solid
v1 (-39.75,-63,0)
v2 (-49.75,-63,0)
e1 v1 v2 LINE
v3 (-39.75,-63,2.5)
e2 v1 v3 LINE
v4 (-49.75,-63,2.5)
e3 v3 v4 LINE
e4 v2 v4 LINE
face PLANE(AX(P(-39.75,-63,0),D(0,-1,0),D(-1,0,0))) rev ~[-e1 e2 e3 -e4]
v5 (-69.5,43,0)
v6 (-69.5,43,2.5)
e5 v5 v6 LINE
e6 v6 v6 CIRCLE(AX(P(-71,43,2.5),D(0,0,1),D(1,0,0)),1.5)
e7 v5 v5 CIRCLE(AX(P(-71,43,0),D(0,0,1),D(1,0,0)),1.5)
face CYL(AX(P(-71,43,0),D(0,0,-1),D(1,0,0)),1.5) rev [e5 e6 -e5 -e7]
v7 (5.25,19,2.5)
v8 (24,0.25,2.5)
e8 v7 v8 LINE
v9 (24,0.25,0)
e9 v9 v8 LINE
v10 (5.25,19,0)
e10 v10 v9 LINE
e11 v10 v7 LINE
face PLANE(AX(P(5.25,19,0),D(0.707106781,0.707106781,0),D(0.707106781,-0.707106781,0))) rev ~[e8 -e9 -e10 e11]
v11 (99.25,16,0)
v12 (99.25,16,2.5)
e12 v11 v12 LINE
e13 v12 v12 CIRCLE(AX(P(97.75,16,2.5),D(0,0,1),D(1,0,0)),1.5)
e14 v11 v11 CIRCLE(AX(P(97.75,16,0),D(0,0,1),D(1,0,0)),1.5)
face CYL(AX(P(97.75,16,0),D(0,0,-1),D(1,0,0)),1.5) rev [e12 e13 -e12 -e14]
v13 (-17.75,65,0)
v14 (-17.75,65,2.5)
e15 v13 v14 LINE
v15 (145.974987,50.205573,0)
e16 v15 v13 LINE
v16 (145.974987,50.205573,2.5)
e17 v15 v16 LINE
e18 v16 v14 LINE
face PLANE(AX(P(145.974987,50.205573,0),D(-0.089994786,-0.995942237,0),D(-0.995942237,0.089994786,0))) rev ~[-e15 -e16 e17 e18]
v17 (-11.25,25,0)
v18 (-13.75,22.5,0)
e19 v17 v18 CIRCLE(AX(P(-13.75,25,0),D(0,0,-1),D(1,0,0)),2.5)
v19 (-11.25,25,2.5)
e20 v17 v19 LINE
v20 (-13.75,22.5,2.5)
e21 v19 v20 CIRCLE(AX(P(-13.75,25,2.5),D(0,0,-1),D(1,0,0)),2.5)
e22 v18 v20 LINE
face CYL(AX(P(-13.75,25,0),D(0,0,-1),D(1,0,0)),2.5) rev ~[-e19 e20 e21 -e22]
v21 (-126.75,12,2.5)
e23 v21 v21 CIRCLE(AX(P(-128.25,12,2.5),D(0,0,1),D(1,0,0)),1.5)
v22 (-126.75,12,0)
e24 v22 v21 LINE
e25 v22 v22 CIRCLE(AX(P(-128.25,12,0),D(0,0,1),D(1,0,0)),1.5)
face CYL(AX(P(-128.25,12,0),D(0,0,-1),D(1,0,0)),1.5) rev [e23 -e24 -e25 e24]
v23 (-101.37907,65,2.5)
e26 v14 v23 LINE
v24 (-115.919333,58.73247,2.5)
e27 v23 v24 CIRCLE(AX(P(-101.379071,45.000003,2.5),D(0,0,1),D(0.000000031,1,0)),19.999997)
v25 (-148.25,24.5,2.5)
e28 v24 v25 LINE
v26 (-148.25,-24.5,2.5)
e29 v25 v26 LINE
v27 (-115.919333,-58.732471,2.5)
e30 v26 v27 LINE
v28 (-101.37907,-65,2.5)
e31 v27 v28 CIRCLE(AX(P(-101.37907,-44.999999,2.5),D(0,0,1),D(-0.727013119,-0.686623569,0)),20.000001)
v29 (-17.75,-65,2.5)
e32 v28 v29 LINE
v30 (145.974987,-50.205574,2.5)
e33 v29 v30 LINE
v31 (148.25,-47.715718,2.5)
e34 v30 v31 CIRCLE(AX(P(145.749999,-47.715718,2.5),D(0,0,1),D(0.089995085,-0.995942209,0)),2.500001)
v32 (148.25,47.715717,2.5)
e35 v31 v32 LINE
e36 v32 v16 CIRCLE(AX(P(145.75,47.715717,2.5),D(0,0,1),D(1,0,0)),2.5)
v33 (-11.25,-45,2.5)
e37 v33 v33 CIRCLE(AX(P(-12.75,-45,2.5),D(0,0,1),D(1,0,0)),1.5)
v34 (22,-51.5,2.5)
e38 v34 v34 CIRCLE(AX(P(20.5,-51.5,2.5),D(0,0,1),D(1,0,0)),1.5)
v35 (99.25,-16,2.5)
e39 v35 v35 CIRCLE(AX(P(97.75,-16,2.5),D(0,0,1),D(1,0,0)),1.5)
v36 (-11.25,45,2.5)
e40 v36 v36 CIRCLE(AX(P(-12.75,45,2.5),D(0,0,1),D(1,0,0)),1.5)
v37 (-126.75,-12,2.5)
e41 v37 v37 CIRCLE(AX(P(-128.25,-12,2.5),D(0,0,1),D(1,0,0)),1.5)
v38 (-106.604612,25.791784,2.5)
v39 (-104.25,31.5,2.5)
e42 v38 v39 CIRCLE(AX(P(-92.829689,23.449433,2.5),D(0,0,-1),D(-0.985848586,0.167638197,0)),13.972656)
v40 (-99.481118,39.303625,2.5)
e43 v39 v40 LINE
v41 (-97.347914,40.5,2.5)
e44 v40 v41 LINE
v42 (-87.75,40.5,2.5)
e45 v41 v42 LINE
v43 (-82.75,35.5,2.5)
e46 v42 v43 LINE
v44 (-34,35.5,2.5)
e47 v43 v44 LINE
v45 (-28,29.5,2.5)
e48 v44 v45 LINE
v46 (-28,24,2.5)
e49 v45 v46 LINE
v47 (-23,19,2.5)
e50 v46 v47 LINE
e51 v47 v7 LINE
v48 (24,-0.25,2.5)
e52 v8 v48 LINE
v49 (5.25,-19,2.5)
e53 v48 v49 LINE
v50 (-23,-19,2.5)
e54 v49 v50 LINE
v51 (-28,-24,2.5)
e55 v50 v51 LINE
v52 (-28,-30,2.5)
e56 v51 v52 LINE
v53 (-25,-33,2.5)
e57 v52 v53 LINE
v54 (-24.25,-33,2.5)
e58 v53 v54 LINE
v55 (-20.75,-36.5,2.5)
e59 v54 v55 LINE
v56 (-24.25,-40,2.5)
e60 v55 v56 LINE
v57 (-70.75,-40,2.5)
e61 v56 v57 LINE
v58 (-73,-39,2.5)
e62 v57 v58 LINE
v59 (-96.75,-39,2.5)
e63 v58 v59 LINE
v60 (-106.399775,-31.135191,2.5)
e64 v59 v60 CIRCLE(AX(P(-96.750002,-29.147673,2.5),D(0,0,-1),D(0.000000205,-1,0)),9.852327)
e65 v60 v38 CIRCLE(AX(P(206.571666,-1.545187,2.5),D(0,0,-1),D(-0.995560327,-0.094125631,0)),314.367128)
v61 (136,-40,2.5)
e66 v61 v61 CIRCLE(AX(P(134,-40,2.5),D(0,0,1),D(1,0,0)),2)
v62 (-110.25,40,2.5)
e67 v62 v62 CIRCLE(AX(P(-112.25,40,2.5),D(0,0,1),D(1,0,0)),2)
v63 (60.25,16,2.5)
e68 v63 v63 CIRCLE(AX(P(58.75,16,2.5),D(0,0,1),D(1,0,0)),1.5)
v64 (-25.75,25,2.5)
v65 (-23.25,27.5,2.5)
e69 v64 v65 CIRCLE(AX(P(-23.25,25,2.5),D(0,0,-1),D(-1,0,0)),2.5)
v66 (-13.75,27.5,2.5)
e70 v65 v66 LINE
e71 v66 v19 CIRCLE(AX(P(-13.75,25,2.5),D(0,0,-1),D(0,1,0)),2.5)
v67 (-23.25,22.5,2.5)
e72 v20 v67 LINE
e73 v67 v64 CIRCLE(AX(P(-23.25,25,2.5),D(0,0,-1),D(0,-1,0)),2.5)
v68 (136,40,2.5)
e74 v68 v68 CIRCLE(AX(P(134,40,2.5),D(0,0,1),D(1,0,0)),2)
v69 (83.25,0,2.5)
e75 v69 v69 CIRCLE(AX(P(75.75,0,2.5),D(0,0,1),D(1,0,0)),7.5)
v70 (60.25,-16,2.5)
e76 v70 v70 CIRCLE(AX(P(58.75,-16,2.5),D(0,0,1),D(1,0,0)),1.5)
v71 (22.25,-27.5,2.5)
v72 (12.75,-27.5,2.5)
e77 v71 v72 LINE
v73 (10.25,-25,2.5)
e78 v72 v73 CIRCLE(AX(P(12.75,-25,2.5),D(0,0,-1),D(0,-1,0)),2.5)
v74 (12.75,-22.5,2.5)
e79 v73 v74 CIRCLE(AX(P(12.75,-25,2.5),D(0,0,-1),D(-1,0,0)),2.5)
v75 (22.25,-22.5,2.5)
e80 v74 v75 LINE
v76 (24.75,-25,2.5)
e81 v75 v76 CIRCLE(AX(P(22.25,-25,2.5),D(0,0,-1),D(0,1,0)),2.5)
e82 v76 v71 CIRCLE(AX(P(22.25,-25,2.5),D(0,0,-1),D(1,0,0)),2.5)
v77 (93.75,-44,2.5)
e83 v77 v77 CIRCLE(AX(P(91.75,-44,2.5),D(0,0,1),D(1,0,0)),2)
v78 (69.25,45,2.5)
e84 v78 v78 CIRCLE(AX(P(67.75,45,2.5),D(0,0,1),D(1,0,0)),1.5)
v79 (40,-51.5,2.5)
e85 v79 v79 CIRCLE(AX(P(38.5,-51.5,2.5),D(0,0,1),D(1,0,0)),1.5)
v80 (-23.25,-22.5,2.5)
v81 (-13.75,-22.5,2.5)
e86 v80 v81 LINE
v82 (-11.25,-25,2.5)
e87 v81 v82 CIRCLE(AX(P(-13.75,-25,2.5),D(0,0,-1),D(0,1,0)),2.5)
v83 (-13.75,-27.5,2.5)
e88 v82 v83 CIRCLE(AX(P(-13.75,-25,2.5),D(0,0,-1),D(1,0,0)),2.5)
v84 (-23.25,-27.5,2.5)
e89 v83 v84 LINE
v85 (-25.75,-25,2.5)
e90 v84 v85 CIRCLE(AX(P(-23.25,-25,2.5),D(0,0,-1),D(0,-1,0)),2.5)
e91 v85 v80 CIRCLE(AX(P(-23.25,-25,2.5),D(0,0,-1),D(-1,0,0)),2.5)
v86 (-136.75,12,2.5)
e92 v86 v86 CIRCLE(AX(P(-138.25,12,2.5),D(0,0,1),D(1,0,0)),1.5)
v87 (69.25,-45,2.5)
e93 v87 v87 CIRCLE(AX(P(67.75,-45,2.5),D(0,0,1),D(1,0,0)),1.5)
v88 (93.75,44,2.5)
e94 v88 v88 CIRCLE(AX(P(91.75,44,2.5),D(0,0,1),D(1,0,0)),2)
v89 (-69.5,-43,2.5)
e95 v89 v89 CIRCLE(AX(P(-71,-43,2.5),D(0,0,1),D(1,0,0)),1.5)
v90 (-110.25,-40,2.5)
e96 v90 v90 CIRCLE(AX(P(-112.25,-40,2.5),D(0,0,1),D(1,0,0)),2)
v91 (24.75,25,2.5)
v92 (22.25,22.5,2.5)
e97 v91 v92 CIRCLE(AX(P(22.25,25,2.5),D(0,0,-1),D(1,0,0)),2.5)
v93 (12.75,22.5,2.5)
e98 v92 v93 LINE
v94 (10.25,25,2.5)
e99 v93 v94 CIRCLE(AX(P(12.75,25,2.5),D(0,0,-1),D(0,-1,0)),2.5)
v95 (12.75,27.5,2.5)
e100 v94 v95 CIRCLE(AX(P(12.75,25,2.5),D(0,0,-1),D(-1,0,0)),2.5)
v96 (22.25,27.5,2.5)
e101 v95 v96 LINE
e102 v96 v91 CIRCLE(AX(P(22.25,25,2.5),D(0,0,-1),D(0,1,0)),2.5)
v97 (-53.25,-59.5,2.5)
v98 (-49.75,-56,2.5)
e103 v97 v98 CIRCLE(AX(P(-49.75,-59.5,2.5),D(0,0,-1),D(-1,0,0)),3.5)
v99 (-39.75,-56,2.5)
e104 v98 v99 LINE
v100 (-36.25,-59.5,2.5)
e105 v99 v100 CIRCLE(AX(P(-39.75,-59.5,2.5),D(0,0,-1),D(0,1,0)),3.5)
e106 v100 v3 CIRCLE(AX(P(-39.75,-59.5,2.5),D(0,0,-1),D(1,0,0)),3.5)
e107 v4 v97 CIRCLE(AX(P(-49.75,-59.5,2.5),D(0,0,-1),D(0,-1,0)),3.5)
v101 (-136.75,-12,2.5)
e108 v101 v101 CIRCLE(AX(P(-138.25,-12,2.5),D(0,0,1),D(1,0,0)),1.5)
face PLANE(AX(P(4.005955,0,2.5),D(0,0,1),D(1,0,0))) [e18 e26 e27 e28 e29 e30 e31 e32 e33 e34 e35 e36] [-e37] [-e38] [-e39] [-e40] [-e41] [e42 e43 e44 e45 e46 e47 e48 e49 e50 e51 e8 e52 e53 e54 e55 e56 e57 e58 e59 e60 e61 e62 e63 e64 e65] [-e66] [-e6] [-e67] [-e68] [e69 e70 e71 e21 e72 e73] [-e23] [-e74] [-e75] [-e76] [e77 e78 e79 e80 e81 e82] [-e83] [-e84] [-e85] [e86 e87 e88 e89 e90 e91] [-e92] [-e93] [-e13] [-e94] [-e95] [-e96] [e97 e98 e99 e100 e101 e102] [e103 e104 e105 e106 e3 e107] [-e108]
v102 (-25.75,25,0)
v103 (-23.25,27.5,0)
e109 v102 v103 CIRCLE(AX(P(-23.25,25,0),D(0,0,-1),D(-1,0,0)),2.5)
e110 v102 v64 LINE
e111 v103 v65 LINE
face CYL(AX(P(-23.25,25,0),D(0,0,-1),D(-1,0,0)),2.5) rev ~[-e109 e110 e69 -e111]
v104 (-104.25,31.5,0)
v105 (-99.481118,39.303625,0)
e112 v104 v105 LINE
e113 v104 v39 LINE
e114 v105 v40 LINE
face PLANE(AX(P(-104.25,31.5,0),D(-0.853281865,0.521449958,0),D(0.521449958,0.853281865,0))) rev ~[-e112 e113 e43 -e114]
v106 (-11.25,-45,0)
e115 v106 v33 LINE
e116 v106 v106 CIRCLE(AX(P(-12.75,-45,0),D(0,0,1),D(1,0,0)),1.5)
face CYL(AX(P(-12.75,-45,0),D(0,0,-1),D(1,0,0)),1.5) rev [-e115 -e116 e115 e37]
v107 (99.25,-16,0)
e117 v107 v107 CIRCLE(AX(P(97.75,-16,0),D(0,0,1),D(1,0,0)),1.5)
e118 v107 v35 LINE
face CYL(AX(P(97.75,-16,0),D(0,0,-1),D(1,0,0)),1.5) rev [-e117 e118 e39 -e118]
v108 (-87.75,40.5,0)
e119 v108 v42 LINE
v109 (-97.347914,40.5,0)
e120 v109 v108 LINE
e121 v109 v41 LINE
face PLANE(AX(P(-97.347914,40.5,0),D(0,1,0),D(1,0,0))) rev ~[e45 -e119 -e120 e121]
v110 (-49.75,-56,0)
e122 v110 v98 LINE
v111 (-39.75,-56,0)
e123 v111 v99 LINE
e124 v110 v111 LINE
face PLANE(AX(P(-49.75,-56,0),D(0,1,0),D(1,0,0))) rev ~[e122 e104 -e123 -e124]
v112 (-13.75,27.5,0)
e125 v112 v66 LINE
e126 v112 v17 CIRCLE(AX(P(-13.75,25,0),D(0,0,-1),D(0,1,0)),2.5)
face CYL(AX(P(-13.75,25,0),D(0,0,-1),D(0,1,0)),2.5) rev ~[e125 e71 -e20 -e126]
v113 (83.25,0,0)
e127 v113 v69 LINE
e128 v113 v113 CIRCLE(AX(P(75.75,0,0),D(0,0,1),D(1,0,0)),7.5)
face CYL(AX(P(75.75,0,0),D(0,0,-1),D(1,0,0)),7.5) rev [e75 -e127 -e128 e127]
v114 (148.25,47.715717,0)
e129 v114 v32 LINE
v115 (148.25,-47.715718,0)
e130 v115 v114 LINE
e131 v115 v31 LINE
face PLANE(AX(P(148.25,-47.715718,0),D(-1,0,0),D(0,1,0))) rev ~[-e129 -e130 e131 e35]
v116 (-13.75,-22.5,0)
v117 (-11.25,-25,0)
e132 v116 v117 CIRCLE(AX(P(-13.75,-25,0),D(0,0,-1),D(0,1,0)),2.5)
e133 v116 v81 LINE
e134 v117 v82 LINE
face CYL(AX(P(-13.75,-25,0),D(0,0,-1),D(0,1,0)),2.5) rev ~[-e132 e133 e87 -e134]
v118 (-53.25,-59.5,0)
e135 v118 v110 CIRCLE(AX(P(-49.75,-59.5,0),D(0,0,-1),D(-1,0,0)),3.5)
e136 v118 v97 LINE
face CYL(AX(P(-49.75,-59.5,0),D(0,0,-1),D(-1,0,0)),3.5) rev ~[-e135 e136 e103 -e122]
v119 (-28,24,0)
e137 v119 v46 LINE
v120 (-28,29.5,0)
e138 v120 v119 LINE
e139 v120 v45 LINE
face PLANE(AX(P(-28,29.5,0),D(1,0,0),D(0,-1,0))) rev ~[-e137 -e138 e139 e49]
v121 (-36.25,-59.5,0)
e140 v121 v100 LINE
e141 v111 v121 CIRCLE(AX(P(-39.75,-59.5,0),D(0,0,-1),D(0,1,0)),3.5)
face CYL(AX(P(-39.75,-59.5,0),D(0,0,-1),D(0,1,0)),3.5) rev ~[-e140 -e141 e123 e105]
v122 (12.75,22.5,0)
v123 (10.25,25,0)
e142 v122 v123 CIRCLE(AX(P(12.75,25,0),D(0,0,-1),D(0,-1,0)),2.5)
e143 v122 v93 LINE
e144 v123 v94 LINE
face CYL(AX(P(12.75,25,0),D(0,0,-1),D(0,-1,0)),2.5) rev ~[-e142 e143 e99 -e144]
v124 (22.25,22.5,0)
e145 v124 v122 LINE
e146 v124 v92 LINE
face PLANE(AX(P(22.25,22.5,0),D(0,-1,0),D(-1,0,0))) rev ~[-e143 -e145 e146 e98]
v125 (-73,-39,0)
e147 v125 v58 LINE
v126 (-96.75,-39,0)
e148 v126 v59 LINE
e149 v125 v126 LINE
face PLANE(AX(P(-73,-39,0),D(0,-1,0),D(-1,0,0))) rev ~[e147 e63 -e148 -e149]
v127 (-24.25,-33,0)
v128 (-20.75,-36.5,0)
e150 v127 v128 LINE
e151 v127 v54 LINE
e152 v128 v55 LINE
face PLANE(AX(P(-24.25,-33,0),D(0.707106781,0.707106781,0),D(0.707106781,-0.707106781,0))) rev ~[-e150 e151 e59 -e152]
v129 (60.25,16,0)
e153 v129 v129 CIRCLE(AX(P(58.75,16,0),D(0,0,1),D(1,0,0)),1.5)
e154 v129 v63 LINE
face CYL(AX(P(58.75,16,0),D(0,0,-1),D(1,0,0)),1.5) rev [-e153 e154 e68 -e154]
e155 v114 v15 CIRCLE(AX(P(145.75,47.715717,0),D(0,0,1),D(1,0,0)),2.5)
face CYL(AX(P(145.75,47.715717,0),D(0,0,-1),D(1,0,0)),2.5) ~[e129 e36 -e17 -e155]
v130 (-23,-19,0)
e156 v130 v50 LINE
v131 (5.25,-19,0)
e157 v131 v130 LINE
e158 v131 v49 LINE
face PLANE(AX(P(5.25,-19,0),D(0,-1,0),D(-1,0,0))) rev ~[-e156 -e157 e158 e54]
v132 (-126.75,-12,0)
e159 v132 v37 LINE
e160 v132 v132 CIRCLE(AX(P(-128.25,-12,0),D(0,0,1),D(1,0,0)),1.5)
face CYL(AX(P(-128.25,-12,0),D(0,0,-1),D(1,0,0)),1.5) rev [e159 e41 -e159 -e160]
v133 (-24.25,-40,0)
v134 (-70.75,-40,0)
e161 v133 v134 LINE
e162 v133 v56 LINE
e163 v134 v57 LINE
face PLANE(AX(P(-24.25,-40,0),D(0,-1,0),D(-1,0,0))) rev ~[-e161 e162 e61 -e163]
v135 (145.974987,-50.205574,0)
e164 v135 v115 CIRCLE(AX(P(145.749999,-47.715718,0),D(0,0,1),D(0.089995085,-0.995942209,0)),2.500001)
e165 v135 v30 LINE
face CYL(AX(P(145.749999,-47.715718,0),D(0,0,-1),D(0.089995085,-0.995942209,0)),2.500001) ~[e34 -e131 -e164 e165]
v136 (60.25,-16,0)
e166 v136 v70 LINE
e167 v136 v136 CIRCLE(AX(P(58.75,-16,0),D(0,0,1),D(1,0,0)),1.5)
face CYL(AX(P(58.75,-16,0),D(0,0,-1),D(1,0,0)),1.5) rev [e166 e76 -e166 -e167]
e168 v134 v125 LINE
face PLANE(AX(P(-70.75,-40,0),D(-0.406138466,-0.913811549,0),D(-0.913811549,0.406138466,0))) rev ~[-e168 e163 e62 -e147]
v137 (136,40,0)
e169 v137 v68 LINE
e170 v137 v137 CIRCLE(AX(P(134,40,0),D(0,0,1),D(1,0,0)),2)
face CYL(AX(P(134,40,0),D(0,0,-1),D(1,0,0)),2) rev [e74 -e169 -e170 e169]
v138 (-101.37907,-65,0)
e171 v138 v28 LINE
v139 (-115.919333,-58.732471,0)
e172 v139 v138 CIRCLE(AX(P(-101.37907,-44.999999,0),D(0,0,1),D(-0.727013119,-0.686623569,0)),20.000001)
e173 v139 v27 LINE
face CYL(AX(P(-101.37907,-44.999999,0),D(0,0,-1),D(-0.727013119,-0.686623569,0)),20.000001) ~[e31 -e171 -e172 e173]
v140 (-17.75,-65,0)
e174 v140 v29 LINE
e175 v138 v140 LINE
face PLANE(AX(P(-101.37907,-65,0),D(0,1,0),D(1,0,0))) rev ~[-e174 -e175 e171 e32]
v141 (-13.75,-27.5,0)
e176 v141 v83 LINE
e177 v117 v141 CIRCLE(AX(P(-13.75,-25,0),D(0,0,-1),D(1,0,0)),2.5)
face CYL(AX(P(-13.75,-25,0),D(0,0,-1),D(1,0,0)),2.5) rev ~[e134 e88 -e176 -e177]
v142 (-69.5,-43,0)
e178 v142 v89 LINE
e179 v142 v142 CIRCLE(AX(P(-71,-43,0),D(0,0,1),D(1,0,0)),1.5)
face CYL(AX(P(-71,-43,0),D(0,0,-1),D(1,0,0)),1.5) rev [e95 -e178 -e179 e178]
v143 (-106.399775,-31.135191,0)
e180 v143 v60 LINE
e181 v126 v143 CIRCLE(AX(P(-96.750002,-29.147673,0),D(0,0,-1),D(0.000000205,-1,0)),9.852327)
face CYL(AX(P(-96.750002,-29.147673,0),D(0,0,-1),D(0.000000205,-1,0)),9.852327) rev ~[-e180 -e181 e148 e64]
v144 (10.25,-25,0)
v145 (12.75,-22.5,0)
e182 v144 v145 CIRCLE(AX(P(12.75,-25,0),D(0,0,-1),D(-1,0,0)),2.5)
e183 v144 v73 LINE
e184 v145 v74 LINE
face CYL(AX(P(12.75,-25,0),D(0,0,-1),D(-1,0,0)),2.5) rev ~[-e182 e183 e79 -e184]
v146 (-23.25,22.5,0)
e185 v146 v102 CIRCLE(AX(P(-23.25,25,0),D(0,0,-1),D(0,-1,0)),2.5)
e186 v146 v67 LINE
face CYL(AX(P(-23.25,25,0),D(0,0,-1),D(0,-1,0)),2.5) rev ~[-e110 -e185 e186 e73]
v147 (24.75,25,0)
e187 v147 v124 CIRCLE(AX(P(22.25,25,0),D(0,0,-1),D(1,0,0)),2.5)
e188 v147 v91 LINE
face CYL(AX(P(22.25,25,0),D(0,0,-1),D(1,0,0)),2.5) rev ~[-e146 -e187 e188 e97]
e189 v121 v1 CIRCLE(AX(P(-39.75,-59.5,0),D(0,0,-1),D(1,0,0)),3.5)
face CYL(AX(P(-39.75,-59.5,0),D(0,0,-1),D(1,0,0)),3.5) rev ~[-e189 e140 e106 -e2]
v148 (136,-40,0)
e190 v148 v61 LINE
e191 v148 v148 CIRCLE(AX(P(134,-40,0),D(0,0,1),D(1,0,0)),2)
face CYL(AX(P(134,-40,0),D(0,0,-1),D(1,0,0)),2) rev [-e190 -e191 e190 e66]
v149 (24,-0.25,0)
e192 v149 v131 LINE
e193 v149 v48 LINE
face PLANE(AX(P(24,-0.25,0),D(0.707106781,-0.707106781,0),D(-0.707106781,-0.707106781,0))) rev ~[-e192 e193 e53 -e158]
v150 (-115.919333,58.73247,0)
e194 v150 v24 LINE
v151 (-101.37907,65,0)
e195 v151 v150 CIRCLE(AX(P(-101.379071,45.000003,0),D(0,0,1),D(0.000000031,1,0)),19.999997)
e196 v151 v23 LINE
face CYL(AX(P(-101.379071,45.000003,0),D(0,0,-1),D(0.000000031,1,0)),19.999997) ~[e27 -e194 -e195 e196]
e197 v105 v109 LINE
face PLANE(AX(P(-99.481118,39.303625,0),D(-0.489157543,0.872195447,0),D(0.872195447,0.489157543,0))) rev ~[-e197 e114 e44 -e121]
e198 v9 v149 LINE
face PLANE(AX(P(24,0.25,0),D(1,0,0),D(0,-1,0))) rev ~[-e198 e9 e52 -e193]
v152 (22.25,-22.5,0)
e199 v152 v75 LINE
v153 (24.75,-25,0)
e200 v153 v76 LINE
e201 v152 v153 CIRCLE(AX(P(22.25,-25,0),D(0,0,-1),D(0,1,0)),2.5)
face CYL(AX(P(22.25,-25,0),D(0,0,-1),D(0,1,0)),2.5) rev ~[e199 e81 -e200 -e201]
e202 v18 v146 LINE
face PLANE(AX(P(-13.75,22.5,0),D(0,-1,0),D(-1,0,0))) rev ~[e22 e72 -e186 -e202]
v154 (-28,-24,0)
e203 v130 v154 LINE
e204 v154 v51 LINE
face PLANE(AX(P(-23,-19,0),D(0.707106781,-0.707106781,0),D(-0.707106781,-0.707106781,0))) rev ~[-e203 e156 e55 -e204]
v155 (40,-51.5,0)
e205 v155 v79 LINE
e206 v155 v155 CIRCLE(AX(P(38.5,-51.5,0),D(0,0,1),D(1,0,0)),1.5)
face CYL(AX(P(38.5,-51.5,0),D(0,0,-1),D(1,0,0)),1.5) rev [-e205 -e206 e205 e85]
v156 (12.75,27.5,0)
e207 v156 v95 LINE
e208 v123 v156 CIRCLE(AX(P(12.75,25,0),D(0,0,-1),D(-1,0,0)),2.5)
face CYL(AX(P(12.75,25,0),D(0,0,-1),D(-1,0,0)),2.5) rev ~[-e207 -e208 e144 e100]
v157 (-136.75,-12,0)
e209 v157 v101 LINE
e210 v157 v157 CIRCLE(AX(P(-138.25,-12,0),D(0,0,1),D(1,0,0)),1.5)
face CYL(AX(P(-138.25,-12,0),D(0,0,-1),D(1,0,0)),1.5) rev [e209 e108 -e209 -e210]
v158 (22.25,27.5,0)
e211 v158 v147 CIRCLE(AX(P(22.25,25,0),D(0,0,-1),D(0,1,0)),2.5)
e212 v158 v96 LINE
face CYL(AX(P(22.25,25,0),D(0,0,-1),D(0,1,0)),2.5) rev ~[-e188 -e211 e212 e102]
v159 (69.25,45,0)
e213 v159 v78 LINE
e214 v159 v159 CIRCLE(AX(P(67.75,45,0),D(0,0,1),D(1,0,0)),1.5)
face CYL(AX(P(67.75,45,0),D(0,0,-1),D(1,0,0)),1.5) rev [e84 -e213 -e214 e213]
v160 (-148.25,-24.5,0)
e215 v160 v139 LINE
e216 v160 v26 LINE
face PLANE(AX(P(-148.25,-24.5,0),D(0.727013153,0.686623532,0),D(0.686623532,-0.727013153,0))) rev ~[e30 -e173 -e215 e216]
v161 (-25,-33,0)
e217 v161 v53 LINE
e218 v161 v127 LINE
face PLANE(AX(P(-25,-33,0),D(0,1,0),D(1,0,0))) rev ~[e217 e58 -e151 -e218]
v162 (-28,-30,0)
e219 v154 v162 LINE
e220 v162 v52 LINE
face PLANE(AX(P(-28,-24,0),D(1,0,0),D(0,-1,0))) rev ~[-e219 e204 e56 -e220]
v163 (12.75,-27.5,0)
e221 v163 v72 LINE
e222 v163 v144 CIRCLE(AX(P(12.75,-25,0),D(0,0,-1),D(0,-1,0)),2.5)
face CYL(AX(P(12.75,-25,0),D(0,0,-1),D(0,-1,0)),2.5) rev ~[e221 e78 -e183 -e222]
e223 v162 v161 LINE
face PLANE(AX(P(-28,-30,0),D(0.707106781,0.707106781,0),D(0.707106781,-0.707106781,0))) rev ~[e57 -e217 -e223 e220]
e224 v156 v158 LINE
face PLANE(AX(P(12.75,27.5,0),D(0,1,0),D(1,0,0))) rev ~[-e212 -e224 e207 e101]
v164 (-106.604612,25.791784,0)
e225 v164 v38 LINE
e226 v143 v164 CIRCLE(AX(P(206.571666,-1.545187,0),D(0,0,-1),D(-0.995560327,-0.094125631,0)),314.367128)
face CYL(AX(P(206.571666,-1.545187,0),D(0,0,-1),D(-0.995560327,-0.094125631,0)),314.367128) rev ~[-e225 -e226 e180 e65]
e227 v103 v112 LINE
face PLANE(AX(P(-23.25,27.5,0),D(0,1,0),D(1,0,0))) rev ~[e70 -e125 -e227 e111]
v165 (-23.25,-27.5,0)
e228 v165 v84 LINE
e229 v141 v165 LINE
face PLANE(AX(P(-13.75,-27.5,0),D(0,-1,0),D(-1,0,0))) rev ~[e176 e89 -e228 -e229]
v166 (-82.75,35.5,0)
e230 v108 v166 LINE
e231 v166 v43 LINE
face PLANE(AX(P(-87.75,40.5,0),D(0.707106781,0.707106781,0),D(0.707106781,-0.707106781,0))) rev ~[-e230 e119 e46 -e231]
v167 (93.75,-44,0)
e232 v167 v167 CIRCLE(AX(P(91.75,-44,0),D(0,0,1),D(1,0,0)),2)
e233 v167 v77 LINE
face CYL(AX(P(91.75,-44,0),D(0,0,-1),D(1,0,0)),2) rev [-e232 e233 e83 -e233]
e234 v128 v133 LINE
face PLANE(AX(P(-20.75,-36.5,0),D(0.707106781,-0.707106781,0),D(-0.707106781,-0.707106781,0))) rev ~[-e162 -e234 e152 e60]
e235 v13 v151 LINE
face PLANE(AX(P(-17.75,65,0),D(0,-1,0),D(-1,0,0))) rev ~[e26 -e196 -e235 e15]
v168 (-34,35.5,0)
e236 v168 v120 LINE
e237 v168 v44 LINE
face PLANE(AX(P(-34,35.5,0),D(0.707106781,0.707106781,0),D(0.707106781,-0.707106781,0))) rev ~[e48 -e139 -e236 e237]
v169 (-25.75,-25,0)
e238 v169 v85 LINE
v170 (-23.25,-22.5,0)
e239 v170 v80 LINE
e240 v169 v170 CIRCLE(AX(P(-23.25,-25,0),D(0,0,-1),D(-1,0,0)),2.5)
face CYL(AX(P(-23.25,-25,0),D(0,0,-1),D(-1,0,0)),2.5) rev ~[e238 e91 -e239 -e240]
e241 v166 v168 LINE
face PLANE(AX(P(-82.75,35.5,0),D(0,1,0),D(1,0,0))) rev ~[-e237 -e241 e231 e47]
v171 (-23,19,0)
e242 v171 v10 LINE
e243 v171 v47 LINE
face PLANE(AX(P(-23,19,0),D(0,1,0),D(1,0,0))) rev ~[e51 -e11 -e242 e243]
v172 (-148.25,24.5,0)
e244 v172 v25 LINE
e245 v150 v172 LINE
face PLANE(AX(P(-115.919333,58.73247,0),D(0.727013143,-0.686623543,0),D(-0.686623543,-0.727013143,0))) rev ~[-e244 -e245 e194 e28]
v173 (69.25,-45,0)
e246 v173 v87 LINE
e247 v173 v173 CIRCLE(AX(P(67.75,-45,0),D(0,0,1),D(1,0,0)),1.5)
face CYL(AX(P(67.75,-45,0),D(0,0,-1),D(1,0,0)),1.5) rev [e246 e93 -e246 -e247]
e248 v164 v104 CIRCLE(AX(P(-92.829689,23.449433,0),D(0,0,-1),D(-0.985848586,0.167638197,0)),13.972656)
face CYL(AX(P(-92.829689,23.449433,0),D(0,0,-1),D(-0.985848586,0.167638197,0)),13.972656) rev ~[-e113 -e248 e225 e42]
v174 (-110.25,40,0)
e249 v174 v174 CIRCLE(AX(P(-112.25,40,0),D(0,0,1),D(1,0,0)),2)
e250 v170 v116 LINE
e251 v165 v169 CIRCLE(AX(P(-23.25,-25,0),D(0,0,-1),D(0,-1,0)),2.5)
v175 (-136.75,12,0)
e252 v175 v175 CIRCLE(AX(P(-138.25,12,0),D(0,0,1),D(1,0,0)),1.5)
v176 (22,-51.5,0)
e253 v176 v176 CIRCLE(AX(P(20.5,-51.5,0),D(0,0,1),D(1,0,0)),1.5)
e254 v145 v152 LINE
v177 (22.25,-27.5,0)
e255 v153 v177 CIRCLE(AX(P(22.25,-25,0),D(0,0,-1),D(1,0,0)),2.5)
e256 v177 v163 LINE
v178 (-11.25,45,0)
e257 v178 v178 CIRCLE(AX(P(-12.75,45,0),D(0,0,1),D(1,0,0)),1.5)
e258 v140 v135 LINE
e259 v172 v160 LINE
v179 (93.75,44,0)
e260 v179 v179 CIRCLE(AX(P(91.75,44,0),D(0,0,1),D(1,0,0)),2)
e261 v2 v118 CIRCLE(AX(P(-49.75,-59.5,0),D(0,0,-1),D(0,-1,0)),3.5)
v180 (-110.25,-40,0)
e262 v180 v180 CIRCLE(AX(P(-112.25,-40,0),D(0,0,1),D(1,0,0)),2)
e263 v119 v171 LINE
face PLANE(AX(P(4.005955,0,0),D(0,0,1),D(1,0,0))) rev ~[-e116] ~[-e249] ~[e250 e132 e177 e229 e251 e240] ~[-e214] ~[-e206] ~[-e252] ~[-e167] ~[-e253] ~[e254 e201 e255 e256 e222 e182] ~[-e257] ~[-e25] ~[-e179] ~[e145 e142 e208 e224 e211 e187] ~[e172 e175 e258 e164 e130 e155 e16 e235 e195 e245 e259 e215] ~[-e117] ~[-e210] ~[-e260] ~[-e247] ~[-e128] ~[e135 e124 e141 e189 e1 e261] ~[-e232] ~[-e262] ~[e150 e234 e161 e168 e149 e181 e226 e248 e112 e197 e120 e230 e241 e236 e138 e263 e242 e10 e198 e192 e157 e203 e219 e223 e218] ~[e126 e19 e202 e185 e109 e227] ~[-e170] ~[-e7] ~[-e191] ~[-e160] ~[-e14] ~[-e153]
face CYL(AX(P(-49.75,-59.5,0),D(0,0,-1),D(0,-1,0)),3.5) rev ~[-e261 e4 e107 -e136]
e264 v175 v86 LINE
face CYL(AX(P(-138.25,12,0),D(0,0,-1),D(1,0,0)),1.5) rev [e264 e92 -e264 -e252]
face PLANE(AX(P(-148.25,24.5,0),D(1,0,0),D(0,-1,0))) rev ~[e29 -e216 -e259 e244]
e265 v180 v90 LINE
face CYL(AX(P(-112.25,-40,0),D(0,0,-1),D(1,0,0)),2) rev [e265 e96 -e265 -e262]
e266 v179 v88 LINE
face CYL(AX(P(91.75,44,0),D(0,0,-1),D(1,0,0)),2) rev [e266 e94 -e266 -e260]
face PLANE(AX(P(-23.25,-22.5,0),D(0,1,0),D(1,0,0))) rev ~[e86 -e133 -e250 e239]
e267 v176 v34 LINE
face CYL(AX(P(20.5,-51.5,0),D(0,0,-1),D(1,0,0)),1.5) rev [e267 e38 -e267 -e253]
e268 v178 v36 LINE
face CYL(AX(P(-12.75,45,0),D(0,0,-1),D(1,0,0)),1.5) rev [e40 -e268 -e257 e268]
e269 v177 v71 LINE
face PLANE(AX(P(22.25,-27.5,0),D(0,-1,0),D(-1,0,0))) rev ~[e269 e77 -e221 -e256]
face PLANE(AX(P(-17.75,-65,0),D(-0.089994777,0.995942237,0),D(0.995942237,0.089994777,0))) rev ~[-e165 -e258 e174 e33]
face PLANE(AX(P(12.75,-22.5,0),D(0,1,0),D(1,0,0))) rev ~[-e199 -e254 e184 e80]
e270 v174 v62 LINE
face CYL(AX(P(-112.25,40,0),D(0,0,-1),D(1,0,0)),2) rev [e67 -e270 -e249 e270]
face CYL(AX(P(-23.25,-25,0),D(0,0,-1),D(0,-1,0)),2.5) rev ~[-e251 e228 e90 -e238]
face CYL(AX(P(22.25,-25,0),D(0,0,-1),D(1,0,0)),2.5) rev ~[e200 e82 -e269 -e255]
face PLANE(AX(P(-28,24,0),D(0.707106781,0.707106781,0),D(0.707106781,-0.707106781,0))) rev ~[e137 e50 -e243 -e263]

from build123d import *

# Parameters (mm, degrees)
F0_R     = 2
F0_R_2   = 1.5
F0_R_3   = 7.5
F1_DEPTH = 2.5


# Not quite as in the source:
# - ends of sketch curves that miss each other by under 0.0002 mm in the source are joined


with BuildPart() as f1:
    # F0 (on Top) → F1 (new body)
    with BuildSketch(Plane.XY):
        with BuildLine():
            Line((-115.919333, 58.73247), (-148.25, 24.5))
            Line((-148.25, 24.5), (-148.25, -24.5))
            Line((-148.25, -24.5), (-115.919333, -58.732471))
            ThreePointArc((-115.919333, -58.732471), (-109.2958427864, -63.3664016249), (-101.37907, -65))
            Line((-101.37907, -65), (-17.75, -65))
            Line((-17.75, -65), (145.974987, -50.205574))
            ThreePointArc((145.974987, -50.205574), (147.5955984677, -49.4020650272), (148.25, -47.715718))
            Line((148.25, -47.715718), (148.25, -36.5))
            Line((148.25, -36.5), (148.25, 47.715717))
            ThreePointArc((148.25, 47.715717), (147.5955984677, 49.4020640272), (145.9749869631, 50.2055725915))
            Line((145.9749869631, 50.2055725915), (-17.75, 65))
            Line((-17.75, 65), (-101.37907, 65))
            ThreePointArc((-101.37907, 65), (-109.2958431202, 63.366401481), (-115.919333, 58.73247))
        make_face()
        with Locations((-112.25, -40)):
            Circle(F0_R, mode=Mode.SUBTRACT)
        with BuildLine():
            ThreePointArc((-49.75, -63), (-52.2248737342, -61.9748737342), (-53.25, -59.5))
            ThreePointArc((-53.25, -59.5), (-52.2248737342, -57.0251262658), (-49.75, -56))
            Line((-49.75, -56), (-39.75, -56))
            ThreePointArc((-39.75, -56), (-37.2751262658, -57.0251262658), (-36.25, -59.5))
            ThreePointArc((-36.25, -59.5), (-37.2751262658, -61.9748737342), (-39.75, -63))
            Line((-39.75, -63), (-49.75, -63))
        make_face(mode=Mode.SUBTRACT)
        with Locations((-71, -43)):
            Circle(F0_R_2, mode=Mode.SUBTRACT)
        with Locations((-12.75, -45)):
            Circle(F0_R_2, mode=Mode.SUBTRACT)
        with Locations((-138.25, -12)):
            Circle(F0_R_2, mode=Mode.SUBTRACT)
        with Locations((-128.25, -12)):
            Circle(F0_R_2, mode=Mode.SUBTRACT)
        with BuildLine():
            ThreePointArc((-23.25, -27.5), (-25.017766953, -26.767766953), (-25.75, -25))
            ThreePointArc((-25.75, -25), (-25.017766953, -23.232233047), (-23.25, -22.5))
            Line((-23.25, -22.5), (-13.75, -22.5))
            ThreePointArc((-13.75, -22.5), (-11.982233047, -23.232233047), (-11.25, -25))
            ThreePointArc((-11.25, -25), (-11.982233047, -26.767766953), (-13.75, -27.5))
            Line((-13.75, -27.5), (-23.25, -27.5))
        make_face(mode=Mode.SUBTRACT)
        with Locations((20.5, -51.5)):
            Circle(F0_R_2, mode=Mode.SUBTRACT)
        with Locations((38.5, -51.5)):
            Circle(F0_R_2, mode=Mode.SUBTRACT)
        with Locations((67.75, -45)):
            Circle(F0_R_2, mode=Mode.SUBTRACT)
        with Locations((91.75, -44)):
            Circle(F0_R, mode=Mode.SUBTRACT)
        with Locations((134, -40)):
            Circle(F0_R, mode=Mode.SUBTRACT)
        with BuildLine():
            ThreePointArc((12.75, -27.5), (10.982233047, -26.767766953), (10.25, -25))
            ThreePointArc((10.25, -25), (10.982233047, -23.232233047), (12.75, -22.5))
            Line((12.75, -22.5), (22.25, -22.5))
            ThreePointArc((22.25, -22.5), (24.017766953, -23.232233047), (24.75, -25))
            ThreePointArc((24.75, -25), (24.017766953, -26.767766953), (22.25, -27.5))
            Line((22.25, -27.5), (12.75, -27.5))
        make_face(mode=Mode.SUBTRACT)
        with Locations((58.75, -16)):
            Circle(F0_R_2, mode=Mode.SUBTRACT)
        with Locations((97.75, -16)):
            Circle(F0_R_2, mode=Mode.SUBTRACT)
        with Locations((-138.25, 12)):
            Circle(F0_R_2, mode=Mode.SUBTRACT)
        with Locations((-128.25, 12)):
            Circle(F0_R_2, mode=Mode.SUBTRACT)
        with BuildLine():
            ThreePointArc((-106.6046121633, 25.7917838577), (-105.7465725985, 28.7775878211), (-104.2499995126, 31.4999996564))
            Line((-104.2499995126, 31.4999996564), (-99.481118, 39.303625))
            Line((-99.481118, 39.303625), (-97.347914, 40.5))
            Line((-97.347914, 40.5), (-87.75, 40.5))
            Line((-87.75, 40.5), (-85.25, 38))
            Line((-85.25, 38), (-82.75, 35.5))
            Line((-82.75, 35.5), (-34, 35.5))
            Line((-34, 35.5), (-28, 29.5))
            Line((-28, 29.5), (-28, 24))
            Line((-28, 24), (-23, 19))
            Line((-23, 19), (5.25, 19))
            Line((5.25, 19), (24, 0.25))
            Line((24, 0.25), (24, -0.25))
            Line((24, -0.25), (5.25, -19))
            Line((5.25, -19), (-23, -19))
            Line((-23, -19), (-28, -24))
            Line((-28, -24), (-28, -30))
            Line((-28, -30), (-25, -33))
            Line((-25, -33), (-24.25, -33))
            Line((-24.25, -33), (-20.75, -36.5))
            Line((-20.75, -36.5), (-24.25, -40))
            Line((-24.25, -40), (-70.75, -40))
            Line((-70.75, -40), (-73, -39))
            Line((-73, -39), (-96.75, -39))
            ThreePointArc((-96.75, -39), (-102.9744154707, -36.7847551324), (-106.3997748707, -31.1351909734))
            ThreePointArc((-106.3997748707, -31.1351909734), (-107.7934268918, -2.6763496917), (-106.6046121633, 25.7917838577))
        make_face(mode=Mode.SUBTRACT)
        with BuildLine():
            ThreePointArc((-23.25, 22.5), (-25.017766953, 23.232233047), (-25.75, 25))
            ThreePointArc((-25.75, 25), (-25.017766953, 26.767766953), (-23.25, 27.5))
            Line((-23.25, 27.5), (-13.75, 27.5))
            ThreePointArc((-13.75, 27.5), (-11.982233047, 26.767766953), (-11.25, 25))
            ThreePointArc((-11.25, 25), (-11.982233047, 23.232233047), (-13.75, 22.5))
            Line((-13.75, 22.5), (-23.25, 22.5))
        make_face(mode=Mode.SUBTRACT)
        with Locations((-112.25, 40)):
            Circle(F0_R, mode=Mode.SUBTRACT)
        with Locations((-71, 43)):
            Circle(F0_R_2, mode=Mode.SUBTRACT)
        with Locations((-12.75, 45)):
            Circle(F0_R_2, mode=Mode.SUBTRACT)
        with Locations((58.75, 16)):
            Circle(F0_R_2, mode=Mode.SUBTRACT)
        with BuildLine():
            ThreePointArc((12.75, 22.5), (10.982233047, 23.232233047), (10.25, 25))
            ThreePointArc((10.25, 25), (10.982233047, 26.767766953), (12.75, 27.5))
            Line((12.75, 27.5), (22.25, 27.5))
            ThreePointArc((22.25, 27.5), (24.017766953, 26.767766953), (24.75, 25))
            ThreePointArc((24.75, 25), (24.017766953, 23.232233047), (22.25, 22.5))
            Line((22.25, 22.5), (12.75, 22.5))
        make_face(mode=Mode.SUBTRACT)
        with Locations((75.75, 0)):
            Circle(F0_R_3, mode=Mode.SUBTRACT)
        with Locations((97.75, 16)):
            Circle(F0_R_2, mode=Mode.SUBTRACT)
        with Locations((67.75, 45)):
            Circle(F0_R_2, mode=Mode.SUBTRACT)
        with Locations((91.75, 44)):
            Circle(F0_R, mode=Mode.SUBTRACT)
        with Locations((134, 40)):
            Circle(F0_R, mode=Mode.SUBTRACT)
    extrude(amount=F1_DEPTH)


solid = f1.part
